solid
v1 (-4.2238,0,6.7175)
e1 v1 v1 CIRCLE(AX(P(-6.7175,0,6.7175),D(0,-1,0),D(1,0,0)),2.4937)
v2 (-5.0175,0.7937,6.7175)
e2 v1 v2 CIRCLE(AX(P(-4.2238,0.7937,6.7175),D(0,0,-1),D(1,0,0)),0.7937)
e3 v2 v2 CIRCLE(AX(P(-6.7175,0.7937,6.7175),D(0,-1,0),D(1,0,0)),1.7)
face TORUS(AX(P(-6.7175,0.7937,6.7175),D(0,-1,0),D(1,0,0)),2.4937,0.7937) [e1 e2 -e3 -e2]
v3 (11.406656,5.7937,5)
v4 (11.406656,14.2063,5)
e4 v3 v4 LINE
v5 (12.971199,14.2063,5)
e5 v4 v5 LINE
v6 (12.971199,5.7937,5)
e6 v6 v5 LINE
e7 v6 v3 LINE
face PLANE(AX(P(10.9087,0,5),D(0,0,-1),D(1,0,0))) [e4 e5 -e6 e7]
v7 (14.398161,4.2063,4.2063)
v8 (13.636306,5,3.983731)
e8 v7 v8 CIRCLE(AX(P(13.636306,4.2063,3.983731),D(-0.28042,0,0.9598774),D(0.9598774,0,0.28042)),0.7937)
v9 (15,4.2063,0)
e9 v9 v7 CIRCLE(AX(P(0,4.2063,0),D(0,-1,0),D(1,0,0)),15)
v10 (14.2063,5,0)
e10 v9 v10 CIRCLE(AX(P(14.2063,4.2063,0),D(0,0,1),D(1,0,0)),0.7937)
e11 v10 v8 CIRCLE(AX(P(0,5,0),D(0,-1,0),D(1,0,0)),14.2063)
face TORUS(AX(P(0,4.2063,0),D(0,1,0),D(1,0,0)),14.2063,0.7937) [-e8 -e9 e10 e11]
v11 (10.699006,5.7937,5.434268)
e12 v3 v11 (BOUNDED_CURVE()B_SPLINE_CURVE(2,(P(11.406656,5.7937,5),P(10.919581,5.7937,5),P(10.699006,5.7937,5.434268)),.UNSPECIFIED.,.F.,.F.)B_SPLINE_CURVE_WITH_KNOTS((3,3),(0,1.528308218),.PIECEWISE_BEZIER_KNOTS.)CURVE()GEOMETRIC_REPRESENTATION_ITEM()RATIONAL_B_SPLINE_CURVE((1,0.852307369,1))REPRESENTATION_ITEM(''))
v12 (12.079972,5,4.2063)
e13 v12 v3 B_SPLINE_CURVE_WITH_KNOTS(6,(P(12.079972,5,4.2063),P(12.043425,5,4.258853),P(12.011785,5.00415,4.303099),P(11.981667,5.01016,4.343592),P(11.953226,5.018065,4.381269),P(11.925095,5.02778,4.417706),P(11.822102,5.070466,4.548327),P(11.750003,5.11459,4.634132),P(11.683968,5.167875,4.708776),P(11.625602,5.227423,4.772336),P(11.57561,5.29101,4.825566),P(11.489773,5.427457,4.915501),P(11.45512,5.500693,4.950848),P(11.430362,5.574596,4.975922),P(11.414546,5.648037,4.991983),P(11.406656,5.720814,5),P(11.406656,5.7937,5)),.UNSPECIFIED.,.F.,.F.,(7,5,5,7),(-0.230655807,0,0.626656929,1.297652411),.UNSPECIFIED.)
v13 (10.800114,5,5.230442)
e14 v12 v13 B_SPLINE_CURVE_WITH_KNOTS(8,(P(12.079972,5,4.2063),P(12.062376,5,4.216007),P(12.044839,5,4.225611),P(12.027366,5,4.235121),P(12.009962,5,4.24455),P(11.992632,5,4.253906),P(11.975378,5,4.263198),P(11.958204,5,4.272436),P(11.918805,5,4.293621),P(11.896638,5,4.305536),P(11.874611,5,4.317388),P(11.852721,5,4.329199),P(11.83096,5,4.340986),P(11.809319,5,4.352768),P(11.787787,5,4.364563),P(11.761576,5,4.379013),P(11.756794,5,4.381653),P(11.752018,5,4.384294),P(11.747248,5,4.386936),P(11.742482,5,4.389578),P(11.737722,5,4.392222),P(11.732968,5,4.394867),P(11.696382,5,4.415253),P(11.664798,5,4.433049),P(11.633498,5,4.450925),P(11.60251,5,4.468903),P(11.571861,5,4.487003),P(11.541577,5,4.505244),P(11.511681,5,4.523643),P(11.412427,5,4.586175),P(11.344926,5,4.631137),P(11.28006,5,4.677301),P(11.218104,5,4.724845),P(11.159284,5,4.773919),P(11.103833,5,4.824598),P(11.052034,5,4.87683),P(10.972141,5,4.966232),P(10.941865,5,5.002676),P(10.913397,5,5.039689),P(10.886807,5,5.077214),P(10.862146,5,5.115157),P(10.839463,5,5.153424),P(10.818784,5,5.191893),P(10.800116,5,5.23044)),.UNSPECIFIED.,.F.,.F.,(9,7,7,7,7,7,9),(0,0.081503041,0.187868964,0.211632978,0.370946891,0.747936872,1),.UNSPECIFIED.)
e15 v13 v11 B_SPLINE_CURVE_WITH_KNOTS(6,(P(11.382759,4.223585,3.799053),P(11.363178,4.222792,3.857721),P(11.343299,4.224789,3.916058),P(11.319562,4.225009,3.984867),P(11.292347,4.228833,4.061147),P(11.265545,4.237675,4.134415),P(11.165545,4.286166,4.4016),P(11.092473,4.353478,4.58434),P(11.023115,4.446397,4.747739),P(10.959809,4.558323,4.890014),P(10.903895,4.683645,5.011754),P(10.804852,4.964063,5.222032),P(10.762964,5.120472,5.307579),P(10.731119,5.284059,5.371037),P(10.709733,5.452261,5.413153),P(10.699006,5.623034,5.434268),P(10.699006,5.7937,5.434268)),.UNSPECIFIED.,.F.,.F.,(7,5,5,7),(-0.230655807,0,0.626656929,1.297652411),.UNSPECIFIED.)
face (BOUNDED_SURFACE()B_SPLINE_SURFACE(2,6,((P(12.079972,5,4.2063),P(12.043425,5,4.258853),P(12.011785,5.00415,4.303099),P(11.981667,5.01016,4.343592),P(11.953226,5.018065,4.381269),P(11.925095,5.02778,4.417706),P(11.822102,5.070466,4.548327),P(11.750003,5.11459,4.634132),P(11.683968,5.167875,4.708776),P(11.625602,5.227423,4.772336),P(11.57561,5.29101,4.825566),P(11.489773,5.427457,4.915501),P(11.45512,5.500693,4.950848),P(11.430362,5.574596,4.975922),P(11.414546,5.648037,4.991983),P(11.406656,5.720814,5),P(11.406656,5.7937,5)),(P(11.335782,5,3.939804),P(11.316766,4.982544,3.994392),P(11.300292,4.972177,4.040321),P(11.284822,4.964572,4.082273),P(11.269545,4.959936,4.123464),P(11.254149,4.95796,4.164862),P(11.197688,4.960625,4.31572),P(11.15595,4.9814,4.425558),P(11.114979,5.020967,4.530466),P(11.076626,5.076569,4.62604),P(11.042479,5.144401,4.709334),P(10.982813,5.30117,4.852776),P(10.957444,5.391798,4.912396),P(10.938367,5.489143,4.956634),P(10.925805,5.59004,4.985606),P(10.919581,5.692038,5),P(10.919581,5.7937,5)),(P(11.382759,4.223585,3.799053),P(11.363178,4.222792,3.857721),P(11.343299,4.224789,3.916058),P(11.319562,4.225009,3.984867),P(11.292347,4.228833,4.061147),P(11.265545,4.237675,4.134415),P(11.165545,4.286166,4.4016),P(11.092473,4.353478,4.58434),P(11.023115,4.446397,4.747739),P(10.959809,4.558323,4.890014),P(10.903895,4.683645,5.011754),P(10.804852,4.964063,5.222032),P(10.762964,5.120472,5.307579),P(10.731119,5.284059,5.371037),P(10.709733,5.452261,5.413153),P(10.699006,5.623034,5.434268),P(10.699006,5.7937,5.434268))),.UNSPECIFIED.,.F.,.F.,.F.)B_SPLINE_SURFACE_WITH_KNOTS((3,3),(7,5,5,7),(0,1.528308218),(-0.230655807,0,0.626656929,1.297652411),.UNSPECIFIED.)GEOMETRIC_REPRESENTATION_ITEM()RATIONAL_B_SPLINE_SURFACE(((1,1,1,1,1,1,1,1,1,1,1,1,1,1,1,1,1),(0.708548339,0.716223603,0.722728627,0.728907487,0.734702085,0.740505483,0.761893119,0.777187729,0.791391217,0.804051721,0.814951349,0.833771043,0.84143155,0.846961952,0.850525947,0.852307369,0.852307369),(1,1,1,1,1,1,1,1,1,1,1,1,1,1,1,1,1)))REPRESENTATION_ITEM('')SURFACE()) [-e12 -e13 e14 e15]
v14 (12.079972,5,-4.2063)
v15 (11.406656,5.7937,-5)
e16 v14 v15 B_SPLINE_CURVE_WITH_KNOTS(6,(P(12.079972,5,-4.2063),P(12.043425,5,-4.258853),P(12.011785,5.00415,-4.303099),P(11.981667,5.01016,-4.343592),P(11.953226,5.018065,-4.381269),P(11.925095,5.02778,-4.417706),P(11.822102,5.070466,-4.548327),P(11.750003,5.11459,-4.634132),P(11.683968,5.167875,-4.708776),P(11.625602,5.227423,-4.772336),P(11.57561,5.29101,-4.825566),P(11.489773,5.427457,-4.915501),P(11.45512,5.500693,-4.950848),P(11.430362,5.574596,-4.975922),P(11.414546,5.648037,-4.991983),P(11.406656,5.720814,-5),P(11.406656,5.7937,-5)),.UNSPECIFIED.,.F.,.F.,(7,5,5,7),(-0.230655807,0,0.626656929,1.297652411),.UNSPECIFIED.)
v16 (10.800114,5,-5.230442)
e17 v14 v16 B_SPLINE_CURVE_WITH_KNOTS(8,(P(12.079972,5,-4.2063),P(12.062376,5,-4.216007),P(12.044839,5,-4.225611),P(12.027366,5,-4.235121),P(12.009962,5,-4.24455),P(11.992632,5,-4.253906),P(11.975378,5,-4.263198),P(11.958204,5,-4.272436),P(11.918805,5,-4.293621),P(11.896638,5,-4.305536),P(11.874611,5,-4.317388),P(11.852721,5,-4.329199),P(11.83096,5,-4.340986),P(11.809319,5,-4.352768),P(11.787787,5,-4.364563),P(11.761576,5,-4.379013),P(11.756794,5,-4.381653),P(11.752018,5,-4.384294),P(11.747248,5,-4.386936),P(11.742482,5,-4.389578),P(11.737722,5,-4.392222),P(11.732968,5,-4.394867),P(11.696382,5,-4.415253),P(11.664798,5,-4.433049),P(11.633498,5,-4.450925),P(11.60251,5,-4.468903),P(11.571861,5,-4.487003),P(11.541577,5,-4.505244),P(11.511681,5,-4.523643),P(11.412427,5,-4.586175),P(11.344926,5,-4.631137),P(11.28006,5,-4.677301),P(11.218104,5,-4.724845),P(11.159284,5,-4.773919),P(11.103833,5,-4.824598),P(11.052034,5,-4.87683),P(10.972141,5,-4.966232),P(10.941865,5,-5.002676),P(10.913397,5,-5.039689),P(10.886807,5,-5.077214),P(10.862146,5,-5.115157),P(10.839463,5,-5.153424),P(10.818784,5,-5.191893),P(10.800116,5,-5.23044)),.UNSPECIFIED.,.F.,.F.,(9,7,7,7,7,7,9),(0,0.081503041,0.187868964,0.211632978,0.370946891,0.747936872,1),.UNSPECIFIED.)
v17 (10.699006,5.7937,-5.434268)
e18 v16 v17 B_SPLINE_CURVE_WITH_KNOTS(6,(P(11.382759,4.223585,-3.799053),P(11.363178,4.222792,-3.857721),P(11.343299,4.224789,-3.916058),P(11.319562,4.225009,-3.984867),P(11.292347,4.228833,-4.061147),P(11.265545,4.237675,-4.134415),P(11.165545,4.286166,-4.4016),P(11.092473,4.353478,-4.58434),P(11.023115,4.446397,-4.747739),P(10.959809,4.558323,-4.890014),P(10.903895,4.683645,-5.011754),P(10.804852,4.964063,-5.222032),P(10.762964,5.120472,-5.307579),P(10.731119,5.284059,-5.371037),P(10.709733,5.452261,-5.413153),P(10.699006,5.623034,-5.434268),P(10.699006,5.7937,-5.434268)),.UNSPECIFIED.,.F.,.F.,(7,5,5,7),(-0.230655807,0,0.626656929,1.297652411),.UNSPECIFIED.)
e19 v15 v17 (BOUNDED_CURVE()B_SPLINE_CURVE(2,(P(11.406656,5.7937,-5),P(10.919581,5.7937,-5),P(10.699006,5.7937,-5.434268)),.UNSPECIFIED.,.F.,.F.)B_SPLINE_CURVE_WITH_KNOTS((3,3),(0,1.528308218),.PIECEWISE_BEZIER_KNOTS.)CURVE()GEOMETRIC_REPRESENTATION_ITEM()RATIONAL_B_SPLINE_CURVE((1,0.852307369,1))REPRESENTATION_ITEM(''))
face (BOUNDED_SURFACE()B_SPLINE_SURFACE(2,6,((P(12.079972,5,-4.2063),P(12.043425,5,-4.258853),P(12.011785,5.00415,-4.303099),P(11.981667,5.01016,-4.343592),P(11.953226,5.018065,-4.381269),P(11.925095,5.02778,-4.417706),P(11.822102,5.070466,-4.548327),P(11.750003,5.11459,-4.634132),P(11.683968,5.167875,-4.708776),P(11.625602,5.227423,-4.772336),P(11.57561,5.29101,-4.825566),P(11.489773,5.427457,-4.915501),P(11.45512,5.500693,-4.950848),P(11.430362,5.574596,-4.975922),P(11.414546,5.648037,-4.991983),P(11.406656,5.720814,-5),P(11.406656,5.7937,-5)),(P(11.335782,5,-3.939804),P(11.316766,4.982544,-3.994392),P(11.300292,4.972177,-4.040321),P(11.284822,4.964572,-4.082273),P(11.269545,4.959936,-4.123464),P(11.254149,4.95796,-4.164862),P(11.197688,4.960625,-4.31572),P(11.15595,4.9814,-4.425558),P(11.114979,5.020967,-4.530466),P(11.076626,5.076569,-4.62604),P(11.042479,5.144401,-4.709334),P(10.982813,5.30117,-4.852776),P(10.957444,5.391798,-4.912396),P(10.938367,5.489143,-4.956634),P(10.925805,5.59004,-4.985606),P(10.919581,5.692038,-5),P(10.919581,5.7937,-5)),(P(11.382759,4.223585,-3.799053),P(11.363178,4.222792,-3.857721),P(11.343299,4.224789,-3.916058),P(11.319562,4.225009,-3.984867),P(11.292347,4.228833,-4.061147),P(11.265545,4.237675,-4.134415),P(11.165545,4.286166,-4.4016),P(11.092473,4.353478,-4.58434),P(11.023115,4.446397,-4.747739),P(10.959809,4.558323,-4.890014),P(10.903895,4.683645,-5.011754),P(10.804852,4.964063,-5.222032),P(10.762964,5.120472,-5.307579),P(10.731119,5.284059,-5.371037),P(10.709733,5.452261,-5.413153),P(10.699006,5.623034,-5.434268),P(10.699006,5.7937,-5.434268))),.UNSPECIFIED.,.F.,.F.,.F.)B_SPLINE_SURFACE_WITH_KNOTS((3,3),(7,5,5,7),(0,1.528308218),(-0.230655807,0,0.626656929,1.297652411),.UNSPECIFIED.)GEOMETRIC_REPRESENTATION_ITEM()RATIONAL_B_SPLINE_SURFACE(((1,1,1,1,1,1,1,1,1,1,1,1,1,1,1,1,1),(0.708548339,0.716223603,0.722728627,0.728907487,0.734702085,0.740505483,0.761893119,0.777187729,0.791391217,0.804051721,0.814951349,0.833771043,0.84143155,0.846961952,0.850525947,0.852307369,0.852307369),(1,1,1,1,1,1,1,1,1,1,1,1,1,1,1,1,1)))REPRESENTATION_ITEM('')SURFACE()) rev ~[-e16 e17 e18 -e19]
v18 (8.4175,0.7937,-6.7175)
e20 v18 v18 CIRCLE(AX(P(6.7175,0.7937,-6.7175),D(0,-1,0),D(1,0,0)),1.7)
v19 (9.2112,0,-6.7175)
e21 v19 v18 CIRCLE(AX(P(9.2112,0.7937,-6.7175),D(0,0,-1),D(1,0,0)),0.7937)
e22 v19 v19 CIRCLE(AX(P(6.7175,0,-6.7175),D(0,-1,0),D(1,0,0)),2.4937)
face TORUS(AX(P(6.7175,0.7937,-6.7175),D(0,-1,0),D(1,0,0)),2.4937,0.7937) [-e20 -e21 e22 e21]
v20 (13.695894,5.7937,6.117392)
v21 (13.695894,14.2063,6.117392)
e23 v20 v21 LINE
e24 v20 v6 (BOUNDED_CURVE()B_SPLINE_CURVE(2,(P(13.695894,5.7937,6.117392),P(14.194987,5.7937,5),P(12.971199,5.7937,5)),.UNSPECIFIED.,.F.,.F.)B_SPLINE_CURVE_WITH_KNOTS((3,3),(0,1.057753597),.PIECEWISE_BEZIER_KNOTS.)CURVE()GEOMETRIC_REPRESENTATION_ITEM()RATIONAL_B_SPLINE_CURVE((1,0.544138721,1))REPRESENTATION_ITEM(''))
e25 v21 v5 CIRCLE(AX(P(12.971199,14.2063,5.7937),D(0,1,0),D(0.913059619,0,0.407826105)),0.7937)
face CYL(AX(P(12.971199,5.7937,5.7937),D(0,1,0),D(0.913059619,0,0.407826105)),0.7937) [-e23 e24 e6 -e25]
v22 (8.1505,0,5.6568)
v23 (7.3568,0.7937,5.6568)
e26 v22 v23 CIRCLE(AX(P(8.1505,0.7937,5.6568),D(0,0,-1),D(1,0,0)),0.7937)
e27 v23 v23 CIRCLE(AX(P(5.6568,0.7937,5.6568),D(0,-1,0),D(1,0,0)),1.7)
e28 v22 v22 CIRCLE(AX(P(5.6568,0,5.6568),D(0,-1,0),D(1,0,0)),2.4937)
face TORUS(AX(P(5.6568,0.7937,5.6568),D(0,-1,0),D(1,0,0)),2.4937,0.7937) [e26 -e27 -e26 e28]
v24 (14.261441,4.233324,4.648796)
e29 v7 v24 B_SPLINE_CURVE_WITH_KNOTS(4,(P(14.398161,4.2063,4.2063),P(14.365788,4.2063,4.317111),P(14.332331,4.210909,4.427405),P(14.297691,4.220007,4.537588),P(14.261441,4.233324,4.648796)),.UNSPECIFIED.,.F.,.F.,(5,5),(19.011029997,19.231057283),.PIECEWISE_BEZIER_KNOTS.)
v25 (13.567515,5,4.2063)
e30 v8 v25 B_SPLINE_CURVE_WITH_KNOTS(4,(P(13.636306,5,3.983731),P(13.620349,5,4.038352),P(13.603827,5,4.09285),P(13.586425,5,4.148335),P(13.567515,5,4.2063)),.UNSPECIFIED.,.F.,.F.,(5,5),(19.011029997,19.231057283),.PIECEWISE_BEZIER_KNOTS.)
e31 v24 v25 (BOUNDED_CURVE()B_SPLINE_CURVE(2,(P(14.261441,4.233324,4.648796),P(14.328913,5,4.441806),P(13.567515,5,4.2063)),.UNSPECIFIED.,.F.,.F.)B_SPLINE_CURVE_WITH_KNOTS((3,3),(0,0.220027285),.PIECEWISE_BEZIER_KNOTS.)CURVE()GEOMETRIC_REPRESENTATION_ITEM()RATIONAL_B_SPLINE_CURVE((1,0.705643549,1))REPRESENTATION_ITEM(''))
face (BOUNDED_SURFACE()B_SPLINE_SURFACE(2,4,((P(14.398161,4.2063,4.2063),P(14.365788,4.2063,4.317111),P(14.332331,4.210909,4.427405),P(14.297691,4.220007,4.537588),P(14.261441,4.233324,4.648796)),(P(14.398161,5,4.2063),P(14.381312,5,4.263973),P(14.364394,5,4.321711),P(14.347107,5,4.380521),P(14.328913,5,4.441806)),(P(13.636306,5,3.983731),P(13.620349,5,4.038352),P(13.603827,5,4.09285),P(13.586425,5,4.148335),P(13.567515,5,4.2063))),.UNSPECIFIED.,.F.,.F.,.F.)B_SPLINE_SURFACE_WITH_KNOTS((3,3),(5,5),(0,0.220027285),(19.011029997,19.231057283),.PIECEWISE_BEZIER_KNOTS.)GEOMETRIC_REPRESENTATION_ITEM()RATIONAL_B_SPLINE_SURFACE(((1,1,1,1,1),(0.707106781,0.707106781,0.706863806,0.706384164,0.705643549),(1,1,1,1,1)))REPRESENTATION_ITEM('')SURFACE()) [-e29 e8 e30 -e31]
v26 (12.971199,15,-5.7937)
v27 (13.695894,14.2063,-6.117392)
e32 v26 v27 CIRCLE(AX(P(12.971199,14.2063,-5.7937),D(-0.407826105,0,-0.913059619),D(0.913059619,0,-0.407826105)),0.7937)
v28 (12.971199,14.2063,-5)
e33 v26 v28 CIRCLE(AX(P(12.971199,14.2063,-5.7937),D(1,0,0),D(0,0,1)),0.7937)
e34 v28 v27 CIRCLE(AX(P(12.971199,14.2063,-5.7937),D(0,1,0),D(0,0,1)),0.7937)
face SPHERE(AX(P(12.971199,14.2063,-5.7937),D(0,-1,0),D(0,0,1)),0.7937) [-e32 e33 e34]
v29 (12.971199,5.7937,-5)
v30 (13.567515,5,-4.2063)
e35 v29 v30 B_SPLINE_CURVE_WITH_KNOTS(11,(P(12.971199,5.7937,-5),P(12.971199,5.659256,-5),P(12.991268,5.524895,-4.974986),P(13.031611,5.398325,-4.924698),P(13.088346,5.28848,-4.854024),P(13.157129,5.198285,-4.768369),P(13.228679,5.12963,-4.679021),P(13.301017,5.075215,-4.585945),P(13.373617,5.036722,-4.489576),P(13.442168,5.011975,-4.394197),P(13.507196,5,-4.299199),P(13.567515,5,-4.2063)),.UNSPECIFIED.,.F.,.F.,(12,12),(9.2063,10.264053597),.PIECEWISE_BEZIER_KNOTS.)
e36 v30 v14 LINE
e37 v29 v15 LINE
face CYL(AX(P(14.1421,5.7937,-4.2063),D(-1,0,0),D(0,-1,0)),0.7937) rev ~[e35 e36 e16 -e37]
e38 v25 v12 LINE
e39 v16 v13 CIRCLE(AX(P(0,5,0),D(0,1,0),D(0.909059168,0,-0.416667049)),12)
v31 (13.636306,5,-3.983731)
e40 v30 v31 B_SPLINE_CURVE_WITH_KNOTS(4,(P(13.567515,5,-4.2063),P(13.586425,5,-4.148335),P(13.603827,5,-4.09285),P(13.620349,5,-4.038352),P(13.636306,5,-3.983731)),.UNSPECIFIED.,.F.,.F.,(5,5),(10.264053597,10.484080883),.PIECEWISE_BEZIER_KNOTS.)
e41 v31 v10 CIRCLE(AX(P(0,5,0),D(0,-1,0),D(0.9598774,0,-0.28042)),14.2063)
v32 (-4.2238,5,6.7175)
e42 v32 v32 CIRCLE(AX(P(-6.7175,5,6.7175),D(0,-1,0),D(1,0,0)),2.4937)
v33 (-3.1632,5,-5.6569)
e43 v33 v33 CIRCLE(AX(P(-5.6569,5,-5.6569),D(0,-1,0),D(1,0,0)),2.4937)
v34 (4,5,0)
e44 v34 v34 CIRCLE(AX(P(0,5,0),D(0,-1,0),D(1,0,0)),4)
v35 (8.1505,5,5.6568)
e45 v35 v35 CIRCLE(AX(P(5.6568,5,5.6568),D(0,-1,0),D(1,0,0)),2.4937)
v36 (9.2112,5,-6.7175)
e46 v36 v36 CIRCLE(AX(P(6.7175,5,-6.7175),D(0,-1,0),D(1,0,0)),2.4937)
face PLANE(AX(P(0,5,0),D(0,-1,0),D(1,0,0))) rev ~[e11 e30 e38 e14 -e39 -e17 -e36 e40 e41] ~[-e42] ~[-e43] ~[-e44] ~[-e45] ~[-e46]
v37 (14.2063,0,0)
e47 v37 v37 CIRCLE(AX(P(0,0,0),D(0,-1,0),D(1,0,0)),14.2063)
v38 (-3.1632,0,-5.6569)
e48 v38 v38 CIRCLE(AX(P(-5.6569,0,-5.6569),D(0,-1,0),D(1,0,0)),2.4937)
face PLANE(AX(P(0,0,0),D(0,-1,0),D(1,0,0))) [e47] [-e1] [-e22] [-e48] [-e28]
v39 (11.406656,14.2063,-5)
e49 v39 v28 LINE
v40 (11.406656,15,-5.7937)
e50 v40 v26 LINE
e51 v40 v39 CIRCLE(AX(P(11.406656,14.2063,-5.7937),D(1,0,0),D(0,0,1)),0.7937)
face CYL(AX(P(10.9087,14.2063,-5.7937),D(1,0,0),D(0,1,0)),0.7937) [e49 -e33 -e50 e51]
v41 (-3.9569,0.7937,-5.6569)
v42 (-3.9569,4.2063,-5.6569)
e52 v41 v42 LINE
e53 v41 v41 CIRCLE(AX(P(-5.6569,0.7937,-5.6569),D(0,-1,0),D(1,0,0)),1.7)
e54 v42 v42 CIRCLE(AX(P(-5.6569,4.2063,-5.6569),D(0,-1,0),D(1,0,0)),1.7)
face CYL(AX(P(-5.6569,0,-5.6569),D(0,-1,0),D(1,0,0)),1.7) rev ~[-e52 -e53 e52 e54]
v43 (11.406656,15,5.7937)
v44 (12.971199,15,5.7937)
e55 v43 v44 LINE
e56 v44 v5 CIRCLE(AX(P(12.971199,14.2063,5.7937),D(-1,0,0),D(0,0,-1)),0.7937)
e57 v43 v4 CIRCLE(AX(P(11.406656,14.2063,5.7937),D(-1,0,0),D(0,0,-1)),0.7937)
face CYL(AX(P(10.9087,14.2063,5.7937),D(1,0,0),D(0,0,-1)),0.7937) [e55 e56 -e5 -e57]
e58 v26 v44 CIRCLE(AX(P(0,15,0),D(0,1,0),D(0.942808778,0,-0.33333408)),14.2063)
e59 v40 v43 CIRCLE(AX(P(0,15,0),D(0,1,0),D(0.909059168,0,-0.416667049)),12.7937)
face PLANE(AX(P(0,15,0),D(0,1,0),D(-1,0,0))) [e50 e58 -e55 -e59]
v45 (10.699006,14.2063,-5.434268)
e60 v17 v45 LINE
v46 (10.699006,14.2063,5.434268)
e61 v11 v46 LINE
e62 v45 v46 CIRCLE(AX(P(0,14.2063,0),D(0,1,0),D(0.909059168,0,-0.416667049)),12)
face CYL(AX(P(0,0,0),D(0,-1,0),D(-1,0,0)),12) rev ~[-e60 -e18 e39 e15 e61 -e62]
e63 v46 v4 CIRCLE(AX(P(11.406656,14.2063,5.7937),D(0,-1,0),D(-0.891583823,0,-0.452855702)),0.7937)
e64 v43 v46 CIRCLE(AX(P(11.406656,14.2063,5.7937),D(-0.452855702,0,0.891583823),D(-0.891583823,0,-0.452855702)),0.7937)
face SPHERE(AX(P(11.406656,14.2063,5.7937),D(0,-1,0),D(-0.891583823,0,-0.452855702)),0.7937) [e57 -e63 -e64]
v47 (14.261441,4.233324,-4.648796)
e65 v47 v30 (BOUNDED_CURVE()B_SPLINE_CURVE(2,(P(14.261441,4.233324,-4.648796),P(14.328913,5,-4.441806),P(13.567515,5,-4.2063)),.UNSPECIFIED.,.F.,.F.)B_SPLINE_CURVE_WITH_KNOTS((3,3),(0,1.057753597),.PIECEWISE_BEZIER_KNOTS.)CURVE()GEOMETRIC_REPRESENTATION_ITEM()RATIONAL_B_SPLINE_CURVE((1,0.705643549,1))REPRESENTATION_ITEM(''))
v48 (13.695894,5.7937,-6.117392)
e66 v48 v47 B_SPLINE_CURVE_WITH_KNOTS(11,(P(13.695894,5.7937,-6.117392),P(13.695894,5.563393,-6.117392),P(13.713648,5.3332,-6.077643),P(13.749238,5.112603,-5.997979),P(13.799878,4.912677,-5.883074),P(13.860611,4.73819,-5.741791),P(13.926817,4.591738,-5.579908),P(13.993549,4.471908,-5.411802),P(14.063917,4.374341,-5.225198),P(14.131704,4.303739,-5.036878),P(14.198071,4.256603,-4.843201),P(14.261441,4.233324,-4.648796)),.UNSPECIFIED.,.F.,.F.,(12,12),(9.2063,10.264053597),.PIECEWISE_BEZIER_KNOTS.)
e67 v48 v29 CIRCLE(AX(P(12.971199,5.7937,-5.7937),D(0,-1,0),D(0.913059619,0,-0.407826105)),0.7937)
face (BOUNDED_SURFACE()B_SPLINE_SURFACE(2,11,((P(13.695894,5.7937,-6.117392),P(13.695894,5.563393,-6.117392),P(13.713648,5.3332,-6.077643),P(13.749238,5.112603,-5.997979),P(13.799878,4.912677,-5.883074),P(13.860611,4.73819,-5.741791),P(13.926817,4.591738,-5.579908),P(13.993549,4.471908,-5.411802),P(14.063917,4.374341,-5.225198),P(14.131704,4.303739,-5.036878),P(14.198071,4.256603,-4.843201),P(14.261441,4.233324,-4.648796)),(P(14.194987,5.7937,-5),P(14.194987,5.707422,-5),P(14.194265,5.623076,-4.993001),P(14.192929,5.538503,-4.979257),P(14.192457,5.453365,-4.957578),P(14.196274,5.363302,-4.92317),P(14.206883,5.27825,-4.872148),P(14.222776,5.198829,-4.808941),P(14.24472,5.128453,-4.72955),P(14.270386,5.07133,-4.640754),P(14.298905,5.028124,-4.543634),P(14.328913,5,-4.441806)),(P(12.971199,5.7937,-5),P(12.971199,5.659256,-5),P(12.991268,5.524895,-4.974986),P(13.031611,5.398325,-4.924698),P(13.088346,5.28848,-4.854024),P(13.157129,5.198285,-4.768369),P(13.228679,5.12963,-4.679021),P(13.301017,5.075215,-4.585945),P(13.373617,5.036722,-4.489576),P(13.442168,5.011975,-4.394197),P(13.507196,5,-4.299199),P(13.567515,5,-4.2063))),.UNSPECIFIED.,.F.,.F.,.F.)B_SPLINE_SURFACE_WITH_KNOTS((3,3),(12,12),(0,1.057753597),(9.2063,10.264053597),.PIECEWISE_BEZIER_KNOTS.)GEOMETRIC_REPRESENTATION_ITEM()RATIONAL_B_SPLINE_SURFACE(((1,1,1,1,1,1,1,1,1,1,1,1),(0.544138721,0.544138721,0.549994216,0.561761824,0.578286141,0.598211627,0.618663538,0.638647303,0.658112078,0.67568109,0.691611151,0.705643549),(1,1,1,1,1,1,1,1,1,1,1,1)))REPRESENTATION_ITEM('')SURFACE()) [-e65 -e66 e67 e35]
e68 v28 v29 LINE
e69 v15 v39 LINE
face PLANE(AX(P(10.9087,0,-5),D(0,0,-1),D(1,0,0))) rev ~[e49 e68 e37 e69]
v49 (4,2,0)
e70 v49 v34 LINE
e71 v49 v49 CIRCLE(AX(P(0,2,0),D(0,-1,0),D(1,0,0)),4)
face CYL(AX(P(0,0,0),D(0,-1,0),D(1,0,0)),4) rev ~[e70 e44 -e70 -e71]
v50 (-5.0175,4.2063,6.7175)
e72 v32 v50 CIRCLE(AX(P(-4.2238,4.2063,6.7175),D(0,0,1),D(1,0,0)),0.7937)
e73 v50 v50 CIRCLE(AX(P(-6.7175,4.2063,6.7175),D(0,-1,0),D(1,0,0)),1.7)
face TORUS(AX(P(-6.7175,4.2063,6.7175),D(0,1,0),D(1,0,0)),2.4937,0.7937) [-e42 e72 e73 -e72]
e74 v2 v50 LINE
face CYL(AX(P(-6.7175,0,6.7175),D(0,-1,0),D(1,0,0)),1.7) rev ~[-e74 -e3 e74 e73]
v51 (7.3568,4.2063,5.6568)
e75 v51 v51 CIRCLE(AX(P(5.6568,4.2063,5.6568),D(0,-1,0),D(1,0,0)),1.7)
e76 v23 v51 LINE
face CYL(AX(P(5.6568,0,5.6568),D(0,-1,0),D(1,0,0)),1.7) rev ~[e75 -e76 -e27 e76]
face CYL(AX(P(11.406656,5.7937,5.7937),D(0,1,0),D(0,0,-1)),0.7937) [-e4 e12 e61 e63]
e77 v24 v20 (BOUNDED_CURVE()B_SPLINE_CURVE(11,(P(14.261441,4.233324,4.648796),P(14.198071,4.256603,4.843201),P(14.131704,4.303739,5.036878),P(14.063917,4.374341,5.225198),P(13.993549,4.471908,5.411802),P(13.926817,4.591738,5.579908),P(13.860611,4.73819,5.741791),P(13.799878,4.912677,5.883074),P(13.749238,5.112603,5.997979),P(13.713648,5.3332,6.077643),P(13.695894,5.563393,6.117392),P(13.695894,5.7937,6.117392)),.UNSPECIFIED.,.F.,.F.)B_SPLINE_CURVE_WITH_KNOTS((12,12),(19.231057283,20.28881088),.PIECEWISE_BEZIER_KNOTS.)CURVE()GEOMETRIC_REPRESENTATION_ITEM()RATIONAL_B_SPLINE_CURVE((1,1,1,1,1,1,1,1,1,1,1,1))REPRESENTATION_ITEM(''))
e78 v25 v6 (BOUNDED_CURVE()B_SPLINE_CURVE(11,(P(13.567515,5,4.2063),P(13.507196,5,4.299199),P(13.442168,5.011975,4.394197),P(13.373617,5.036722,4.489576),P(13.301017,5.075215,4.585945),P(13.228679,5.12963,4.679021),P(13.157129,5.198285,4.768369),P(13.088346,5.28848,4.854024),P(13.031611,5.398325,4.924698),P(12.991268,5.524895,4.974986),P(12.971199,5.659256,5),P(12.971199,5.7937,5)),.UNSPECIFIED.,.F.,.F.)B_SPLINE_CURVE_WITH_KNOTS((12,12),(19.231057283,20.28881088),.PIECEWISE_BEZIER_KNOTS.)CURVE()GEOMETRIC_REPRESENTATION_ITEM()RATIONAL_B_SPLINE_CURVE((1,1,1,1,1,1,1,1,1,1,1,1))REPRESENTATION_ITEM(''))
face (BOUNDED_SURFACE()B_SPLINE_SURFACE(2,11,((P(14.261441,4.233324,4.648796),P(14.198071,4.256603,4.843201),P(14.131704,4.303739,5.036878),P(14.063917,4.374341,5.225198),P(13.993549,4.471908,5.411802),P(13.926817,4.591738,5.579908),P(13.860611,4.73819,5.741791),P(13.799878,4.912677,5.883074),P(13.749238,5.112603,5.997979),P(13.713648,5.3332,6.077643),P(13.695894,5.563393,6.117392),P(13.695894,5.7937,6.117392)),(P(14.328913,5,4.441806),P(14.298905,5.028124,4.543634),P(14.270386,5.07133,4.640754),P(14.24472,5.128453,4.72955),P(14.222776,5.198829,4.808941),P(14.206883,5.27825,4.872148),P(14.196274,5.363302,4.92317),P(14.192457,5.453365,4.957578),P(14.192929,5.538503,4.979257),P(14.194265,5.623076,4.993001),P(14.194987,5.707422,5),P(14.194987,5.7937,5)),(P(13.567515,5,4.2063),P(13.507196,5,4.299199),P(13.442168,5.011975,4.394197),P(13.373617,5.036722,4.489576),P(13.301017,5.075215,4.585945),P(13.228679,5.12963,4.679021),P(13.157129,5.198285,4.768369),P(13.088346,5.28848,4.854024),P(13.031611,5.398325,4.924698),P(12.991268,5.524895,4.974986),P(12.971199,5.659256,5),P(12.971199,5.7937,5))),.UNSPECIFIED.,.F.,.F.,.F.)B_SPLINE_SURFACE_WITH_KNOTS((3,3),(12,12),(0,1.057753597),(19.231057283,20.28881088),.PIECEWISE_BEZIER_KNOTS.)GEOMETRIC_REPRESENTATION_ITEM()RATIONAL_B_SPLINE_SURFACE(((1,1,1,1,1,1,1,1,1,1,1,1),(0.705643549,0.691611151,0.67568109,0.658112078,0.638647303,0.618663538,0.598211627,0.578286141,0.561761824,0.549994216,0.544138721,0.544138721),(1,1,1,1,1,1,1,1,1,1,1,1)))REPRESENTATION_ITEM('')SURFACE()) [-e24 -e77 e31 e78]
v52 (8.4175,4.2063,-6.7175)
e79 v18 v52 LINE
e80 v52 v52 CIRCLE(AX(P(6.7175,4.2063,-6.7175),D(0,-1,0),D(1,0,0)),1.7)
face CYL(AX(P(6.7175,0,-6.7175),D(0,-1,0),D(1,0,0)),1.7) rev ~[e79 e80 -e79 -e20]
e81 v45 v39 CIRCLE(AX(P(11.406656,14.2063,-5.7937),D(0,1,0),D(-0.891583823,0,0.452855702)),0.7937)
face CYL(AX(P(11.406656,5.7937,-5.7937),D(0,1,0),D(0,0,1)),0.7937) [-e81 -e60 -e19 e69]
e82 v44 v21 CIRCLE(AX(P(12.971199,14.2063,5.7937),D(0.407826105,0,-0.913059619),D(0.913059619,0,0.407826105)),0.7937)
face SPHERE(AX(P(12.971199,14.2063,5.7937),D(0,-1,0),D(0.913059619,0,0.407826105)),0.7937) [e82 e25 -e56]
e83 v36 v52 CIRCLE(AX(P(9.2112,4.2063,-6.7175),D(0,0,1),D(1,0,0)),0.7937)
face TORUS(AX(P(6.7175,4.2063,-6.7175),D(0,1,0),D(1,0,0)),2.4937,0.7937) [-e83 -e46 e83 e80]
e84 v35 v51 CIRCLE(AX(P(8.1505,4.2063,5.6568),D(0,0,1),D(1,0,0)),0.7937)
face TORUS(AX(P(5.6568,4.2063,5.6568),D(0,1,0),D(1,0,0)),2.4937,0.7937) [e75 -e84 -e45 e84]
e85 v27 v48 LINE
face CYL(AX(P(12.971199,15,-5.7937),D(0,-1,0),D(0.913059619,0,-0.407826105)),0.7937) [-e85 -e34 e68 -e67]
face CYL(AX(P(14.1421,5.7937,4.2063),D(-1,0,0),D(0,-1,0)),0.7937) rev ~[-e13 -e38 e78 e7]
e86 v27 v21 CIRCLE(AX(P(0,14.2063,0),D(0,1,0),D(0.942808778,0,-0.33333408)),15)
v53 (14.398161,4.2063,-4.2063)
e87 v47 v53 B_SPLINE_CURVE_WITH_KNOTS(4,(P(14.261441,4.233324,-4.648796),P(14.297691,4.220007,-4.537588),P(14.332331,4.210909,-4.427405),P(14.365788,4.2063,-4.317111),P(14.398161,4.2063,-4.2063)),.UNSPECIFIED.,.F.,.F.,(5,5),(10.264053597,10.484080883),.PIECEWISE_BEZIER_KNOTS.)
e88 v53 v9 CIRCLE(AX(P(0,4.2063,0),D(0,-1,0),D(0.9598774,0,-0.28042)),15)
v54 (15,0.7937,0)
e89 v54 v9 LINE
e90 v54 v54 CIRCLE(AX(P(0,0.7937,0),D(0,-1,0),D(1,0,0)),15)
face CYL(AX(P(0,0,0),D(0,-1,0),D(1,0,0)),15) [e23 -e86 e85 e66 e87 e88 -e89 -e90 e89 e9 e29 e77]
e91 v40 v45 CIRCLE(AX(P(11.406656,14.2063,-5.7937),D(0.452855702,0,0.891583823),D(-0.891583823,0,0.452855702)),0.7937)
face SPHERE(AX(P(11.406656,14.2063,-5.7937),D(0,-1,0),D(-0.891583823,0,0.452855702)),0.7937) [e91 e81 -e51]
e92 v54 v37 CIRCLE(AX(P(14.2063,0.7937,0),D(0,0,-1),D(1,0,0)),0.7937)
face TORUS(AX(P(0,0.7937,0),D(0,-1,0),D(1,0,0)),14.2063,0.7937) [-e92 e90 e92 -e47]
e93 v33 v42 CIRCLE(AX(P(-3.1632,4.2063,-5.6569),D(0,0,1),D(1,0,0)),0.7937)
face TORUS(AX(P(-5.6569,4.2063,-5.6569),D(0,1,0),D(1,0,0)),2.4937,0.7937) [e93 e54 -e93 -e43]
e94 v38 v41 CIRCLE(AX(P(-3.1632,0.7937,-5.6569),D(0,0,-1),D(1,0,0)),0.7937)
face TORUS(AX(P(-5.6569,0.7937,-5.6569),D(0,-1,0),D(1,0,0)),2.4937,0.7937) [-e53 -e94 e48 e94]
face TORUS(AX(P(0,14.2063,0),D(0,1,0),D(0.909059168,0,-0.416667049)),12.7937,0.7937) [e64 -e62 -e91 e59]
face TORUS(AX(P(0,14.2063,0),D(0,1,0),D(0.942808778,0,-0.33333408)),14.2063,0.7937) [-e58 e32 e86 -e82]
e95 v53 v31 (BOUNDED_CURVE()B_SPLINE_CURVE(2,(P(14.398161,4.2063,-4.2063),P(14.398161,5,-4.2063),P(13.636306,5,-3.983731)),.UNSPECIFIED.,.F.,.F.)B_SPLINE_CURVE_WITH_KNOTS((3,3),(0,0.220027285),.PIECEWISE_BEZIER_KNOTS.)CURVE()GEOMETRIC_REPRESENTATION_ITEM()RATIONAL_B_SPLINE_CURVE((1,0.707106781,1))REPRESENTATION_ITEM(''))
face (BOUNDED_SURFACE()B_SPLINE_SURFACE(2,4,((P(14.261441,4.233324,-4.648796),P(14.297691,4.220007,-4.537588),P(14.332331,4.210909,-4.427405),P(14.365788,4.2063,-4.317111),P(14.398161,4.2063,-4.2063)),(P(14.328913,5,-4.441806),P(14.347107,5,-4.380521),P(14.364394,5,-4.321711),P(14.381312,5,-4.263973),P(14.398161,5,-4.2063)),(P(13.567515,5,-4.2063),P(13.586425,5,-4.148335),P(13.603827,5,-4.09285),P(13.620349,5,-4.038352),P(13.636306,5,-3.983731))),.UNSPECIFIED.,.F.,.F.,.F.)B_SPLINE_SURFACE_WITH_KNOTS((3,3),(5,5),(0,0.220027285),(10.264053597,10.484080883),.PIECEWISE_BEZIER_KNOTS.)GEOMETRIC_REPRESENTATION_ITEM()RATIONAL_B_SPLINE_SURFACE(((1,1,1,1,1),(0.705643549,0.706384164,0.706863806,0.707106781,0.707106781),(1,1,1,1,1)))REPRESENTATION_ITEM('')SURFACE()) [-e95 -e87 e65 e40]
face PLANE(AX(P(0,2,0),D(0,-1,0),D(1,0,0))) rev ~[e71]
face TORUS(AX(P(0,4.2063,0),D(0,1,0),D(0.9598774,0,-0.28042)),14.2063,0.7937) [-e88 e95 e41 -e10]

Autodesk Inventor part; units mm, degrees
ref_plane "YZ Plane" through (0, 0, 0) normal (1, 0, 0) x (0, 1, 0)
ref_plane "XZ Plane" through (0, 0, 0) normal (0, 1, 0) x (-1, 0, 0)
ref_plane "XY Plane" through (0, 0, 0) normal (0, 0, 1) x (1, 0, 0)
sketch "Sketch1" plane through (0, 0, 0) normal (0, 1, 0) x (-1, 0, 0)
  circle A0 centre (0, 0) radius 12
  circle A1 centre (0, 0) radius 4
  circle A2 centre (0, 0) radius 15
  line L0 (-10.9087, -5) -> (-14.1421, -5)
  line L1 (-10.9087, 5) -> (-14.1421, 5)
  dimension "d0" = 5
  dimension "d2" = 10
  dimension "d3" = 8
  dimension "d4" = 30
  dimension "d5" = 3
extrude "Extrusion1" add sketch "Sketch1" along normal blind 15 contours A0 L1 A2 L0 picked at (13.8643, -1.1568)
sketch "Sketch2" plane through (0, 0, 0) normal (0, -1, 0) x (1, 0, 0)
  circle A0 centre (0, 0) radius 12
  circle A1 centre (0, 0) radius 4
  circle A2 centre (0, 0) radius 15
  line L0 (-10.9087, -5) -> (-14.1421, -5)
  line L1 (-10.9087, 5) -> (-14.1421, 5)
  dimension "d8" = 5
  dimension "d9" = 10
  dimension "d10" = 8
  dimension "d11" = 30
  dimension "d12" = 3
extrude "Extrusion2" add sketch "Sketch2" against normal blind 5 contours A0
sketch "Sketch3" plane through (0, 0, 0) normal (0, -1, 0) x (1, 0, 0)
  circle A0 centre (0, 0) radius 12
  circle A1 centre (0, 0) radius 4
  circle A2 centre (0, 0) radius 15
  line L0 (-10.9087, -5) -> (-14.1421, -5)
  line L1 (-10.9087, 5) -> (-14.1421, 5)
  dimension "d15" = 5
  dimension "d16" = 10
  dimension "d17" = 8
  dimension "d18" = 30
  dimension "d19" = 3
extrude "Extrusion3" add sketch "Sketch3" against normal blind 5 contours A0 L1 A2 L0 picked at (13.8643, -1.1568)
sketch "Sketch4" plane through (0, 0, 0) normal (0, -1, 0) x (1, 0, 0)
  circle A0 centre (0, 0) radius 12
  circle A1 centre (0, 0) radius 4
  circle A2 centre (0, 0) radius 15
  line L0 (-10.9087, -5) -> (-14.1421, -5)
  line L1 (-10.9087, 5) -> (-14.1421, 5)
  dimension "d22" = 5
  dimension "d23" = 10
  dimension "d24" = 8
  dimension "d25" = 30
  dimension "d26" = 3
extrude "Extrusion4" add sketch "Sketch4" against normal blind 2 contours A1
sketch "Sketch5" plane through (0, 0, 0) normal (0, -1, 0) x (1, 0, 0)
  circle A0 centre (-6.7175, 6.7175) radius 1.7
  circle A1 centre (5.6568, 5.6568) radius 1.7
  circle A2 centre (6.7175, -6.7175) radius 1.7
  circle A3 centre (-5.6569, -5.6569) radius 1.7
  line L0 (0, 0) -> (-10.6066, 10.6066) construction
  arc A4 (14.1421, 5) -> (14.1421, -5) centre (0, 0) ccw projected
  line L1 (0, 0) -> (15, 0) construction
  line L2 (0, 0) -> (10.6066, -10.6066) construction
  line L3 (0, 0) -> (15, 0) construction
  line L4 (0, 0) -> (-10.6066, -10.6066) construction
  line L5 (0, 0) -> (10.6066, 10.6066) construction
  line L6 (0, 0) -> (15, 0) construction
  dimension "d29" = 3.4
  dimension "d30" = 3.4
  dimension "d31" = 3.4
  dimension "d32" = 3.4
  dimension "d34" = 135
  dimension "d35" = 45
  dimension "d36" = 45
  dimension "d37" = 11.3137
  dimension "d38" = 5.6569
  dimension "d39" = 13.435
  dimension "d41" = 6.7175
extrude "Extrusion5" cut sketch "Sketch5" against normal through all
fillet "Fillet1" radius 0.7937 12 edges at (-12, 15, 0) (-15, 15, 0) (12.5254, 15, 5) (14.1421, 10, 5) (15, 5, 0) (14.1421, 10, -5) (12.5254, 15, -5) (12.5254, 5, -5) (12.5254, 5, 5) (10.9087, 10, 5) (10.9087, 10, -5) (-14.1421, 0, 5)
fillet "Fillet2" radius 0.7937 8 edges at (3.9568, 0, 5.6568) (5.0175, 0, -6.7175) (-7.3569, 0, -5.6569) (-8.4175, 0, 6.7175) (-8.4175, 5, 6.7175) (-7.3569, 5, -5.6569) (3.9568, 5, 5.6568) (5.0175, 5, -6.7175)
properties part number "motor_mount"
